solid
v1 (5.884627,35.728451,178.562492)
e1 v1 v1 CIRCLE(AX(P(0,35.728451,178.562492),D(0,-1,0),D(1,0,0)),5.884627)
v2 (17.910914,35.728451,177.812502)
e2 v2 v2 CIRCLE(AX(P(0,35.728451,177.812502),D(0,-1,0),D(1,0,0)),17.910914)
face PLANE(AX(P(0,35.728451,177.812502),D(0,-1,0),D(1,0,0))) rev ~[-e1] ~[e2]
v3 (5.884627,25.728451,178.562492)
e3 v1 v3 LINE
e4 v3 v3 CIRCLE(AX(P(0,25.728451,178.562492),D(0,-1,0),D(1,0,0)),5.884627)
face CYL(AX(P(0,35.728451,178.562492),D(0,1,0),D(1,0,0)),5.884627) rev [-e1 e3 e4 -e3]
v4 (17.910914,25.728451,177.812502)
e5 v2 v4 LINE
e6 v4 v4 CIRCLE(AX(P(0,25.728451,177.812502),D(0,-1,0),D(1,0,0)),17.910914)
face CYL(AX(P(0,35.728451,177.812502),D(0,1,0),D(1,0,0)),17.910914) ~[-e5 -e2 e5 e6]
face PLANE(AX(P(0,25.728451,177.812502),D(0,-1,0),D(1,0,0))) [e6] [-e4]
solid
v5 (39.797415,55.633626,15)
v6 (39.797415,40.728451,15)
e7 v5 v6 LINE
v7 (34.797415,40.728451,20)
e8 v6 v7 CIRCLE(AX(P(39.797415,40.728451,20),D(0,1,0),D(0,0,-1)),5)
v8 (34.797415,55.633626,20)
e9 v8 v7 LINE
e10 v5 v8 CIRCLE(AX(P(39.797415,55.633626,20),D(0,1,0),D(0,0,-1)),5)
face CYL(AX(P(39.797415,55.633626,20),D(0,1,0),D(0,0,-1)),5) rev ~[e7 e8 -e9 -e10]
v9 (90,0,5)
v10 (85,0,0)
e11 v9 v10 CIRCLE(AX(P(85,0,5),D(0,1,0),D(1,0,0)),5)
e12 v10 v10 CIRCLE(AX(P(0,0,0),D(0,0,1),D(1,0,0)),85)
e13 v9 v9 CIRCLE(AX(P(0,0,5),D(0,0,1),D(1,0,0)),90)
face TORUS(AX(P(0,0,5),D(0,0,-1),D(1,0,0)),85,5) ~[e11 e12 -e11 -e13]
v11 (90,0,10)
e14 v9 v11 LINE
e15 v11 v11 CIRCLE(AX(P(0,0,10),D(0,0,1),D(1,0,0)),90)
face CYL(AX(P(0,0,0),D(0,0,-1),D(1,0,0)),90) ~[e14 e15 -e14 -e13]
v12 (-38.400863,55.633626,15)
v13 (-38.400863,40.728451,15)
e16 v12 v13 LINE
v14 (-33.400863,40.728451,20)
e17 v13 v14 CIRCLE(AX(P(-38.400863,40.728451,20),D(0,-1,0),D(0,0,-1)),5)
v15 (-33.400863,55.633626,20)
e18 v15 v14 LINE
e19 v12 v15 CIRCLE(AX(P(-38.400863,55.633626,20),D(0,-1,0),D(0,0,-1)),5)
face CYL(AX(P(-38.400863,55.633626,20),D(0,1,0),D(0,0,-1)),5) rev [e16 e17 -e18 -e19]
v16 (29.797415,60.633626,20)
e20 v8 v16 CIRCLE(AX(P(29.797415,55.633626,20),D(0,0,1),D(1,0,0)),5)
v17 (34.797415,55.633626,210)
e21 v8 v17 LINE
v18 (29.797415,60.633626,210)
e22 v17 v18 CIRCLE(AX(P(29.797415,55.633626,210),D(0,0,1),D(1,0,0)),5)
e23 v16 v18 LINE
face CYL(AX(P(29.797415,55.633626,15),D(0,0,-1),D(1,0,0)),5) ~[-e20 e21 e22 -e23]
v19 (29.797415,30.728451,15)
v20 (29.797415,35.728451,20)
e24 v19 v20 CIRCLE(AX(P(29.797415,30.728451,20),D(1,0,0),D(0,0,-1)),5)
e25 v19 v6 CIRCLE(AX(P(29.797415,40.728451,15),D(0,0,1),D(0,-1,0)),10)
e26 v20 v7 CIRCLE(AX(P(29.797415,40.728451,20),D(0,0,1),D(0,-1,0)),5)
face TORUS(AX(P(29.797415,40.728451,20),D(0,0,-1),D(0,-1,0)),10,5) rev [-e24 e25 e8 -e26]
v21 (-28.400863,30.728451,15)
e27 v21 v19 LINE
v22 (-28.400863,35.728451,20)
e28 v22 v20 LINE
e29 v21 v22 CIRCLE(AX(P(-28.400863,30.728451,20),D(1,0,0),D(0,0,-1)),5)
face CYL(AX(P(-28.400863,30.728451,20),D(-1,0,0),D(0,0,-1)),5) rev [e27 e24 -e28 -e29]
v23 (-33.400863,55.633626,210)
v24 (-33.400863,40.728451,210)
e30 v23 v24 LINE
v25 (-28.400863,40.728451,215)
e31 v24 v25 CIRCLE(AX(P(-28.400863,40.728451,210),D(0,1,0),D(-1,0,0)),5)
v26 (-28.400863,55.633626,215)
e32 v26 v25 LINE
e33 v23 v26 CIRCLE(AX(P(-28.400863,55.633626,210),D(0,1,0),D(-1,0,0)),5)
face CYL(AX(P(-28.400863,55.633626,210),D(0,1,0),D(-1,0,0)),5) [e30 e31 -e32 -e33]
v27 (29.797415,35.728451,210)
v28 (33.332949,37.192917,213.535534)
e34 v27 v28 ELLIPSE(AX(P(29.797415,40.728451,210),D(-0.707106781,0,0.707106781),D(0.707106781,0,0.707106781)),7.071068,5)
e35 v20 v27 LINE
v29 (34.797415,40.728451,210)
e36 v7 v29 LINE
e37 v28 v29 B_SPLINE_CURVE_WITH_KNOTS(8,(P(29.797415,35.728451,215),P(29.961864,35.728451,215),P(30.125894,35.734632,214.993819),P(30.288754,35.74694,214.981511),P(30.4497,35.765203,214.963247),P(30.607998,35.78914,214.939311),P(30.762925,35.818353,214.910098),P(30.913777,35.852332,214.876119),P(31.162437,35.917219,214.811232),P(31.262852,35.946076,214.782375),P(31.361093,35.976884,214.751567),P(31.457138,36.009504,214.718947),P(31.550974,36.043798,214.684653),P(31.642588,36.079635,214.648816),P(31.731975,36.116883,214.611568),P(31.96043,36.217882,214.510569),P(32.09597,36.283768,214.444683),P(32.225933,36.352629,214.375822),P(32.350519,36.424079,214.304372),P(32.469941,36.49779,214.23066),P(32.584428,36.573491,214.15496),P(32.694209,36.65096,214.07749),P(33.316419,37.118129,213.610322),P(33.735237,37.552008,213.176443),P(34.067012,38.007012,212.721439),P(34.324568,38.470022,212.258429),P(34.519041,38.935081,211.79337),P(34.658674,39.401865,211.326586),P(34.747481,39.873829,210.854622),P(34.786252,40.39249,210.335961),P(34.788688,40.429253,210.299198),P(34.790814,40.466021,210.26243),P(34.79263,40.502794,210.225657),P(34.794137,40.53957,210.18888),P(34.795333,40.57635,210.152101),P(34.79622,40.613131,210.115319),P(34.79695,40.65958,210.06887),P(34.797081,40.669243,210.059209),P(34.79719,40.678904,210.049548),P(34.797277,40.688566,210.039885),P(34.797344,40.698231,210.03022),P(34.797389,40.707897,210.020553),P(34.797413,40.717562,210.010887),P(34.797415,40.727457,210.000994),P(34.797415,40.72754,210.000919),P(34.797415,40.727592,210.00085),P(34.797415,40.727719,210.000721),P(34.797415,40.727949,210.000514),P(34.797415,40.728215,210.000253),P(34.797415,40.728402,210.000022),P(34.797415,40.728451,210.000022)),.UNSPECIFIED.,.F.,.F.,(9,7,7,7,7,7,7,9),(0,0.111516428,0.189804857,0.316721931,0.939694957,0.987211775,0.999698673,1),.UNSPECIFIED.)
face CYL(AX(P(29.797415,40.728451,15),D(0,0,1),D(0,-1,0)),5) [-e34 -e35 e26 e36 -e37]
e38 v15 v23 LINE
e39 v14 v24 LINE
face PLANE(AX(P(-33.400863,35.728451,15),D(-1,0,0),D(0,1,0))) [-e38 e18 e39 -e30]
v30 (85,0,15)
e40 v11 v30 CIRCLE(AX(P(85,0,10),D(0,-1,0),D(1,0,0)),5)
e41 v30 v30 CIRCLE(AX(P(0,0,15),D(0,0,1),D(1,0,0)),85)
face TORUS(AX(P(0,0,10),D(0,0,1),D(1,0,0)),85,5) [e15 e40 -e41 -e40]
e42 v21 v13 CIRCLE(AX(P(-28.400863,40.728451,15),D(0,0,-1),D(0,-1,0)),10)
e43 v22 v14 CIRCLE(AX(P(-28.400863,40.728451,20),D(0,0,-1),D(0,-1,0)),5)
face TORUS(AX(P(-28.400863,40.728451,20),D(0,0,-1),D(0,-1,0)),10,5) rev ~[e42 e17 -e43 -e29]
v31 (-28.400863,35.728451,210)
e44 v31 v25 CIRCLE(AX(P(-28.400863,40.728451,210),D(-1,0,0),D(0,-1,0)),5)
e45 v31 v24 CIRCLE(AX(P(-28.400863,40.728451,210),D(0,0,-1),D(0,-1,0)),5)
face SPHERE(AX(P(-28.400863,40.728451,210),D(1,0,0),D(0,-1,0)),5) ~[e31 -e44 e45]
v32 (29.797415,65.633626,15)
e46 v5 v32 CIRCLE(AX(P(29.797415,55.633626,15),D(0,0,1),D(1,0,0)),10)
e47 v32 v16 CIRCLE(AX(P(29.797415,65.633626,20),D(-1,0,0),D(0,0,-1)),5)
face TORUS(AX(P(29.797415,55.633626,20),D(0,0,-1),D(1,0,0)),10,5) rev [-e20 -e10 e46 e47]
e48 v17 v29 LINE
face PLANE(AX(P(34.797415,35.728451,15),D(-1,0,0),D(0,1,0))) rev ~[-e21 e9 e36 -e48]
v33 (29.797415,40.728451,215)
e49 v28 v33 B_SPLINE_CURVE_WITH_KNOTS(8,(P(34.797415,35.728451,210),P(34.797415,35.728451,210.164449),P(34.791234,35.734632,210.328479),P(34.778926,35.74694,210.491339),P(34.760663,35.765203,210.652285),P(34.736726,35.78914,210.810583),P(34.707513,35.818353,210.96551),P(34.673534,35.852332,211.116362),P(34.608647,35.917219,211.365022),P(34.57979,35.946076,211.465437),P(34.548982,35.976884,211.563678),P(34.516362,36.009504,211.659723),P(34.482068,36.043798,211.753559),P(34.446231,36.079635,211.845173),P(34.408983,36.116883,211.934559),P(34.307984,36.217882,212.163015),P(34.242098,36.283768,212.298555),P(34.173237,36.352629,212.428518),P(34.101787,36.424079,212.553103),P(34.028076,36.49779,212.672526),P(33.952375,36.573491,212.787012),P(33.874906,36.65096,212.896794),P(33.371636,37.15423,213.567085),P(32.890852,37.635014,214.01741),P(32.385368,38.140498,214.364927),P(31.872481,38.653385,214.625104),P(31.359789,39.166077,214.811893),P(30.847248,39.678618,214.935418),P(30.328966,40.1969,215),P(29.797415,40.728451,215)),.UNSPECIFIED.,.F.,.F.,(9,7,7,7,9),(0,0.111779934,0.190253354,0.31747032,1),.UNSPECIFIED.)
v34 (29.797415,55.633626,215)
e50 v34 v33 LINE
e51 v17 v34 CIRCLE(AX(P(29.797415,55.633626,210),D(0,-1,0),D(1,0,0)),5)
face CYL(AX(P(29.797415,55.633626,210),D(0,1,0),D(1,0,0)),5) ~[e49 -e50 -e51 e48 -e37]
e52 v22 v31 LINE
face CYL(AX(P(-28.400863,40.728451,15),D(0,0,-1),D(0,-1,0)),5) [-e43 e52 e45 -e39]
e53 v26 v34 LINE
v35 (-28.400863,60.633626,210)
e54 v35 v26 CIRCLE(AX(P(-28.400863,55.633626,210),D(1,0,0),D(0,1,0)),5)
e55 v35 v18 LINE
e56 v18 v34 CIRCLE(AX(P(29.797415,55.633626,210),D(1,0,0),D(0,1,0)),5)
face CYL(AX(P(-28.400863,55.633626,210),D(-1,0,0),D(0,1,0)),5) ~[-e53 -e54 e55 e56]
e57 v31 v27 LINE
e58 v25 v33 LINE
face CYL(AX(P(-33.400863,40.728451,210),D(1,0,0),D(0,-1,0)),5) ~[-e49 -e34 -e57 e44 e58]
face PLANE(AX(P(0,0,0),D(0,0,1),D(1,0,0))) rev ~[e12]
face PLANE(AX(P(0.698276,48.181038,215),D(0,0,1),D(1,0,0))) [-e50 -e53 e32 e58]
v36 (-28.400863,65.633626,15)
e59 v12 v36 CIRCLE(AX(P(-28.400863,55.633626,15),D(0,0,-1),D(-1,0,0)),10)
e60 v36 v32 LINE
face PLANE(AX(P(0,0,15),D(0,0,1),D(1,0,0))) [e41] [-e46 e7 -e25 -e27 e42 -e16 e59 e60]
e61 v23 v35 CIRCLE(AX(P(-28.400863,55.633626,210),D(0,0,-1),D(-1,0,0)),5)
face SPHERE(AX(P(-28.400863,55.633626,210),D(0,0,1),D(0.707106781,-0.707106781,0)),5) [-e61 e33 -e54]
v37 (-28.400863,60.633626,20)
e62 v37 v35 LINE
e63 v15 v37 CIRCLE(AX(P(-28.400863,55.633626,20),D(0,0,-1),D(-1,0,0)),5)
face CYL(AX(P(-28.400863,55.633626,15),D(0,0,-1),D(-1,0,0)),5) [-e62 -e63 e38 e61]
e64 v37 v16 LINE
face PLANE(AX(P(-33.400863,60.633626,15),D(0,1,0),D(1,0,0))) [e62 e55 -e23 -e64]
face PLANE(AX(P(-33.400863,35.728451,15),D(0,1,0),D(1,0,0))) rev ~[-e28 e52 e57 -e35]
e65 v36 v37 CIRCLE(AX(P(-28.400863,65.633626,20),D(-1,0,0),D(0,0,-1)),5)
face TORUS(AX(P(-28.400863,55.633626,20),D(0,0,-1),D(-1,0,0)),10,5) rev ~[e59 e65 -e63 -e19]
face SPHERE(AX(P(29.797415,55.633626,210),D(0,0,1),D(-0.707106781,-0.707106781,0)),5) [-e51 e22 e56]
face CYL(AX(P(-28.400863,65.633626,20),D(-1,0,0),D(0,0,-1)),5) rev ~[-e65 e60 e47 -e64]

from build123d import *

# Parameters (mm, degrees)
F0_R          = 90
F1_DEPTH      = 15
F3_W          = 68.1982785463
F3_H          = 24.9051749706
F4_DEPTH      = 200
F6_R          = 17.9109144278
F6_R_2        = 5.8846273737
F7_DEPTH      = 10
F8_R          = 5
F9_R          = 5
F10_R         = 5
F11_T1_DEPTH  = 195
F11_T3_DEPTH  = 14.9051749706
F11_T5_DEPTH  = 27.4051749706
F11_T7_DEPTH  = 58.1982785463
F11_S11_W     = 5.1
F11_S11_H     = 5.1
F11_T12_DEPTH = 5.1
F11_S17_W     = 5.1
F11_S17_H     = 5.1
F11_T18_DEPTH = 5.1
F11_T22_ANGLE = 90
F11_T23_DEPTH = 14.9051749706
F11_T25_DEPTH = 58.1982785463
F11_T28_ANGLE = 90
F11_T30_ANGLE = 90
F11_T32_ANGLE = 90
F11_T34_ANGLE = 90


# Not quite as in the source:
# - a fillet or chamfer that OpenCascade refuses, or shapes differently, is made with other operations: its cross-section is extruded or revolved along the edge and cut away or added


with BuildPart() as f1:
    # F0 (on Top) → F1 (new body)
    with BuildSketch(Plane.XY):
        Circle(F0_R)
    extrude(amount=F1_DEPTH)

    # F3 (on face) → F4 (join)
    with BuildSketch(Plane.XY.offset(15)):
        with Locations((0.6982758641, 48.1810383499)):
            Rectangle(F3_W, F3_H)
    extrude(amount=F4_DEPTH)

    # F8
    f8_edges = [f1.edges().sort_by_distance(p)[0] for p in [
        (-90, 0, 15),
    ]]
    fillet(f8_edges, radius=F8_R)

    # F9
    f9_edges = [f1.edges().sort_by_distance(p)[0] for p in [
        (-90, 0, 0),
    ]]
    fillet(f9_edges, radius=F9_R)

    # F10
    f10_edges = [f1.edges().sort_by_distance(p)[0] for p in [
        (0.698276, 35.728451, 215),
        (34.797415, 35.728451, 115),
    ]]
    fillet(f10_edges, radius=F10_R)

    # F11: fillet of radius 5 on 14 edges, made by hand

    # F11_s2 → F11_t1 (cut)
    with BuildSketch(Plane.XY.offset(15)):
        with BuildLine():
            ThreePointArc((-28.400863409, 35.7284508646), (-31.936397315, 37.1929169586), (-33.400863409, 40.7284508646))
            Line((-33.400863409, 40.7284508646), (-33.400863409, 35.7284508646))
            Line((-33.400863409, 35.7284508646), (-28.400863409, 35.7284508646))
        make_face()
        with BuildLine():
            ThreePointArc((-33.400863409, 55.6336258352), (-31.936397315, 59.1691597411), (-28.400863409, 60.6336258352))
            Line((-28.400863409, 60.6336258352), (-33.400863409, 60.6336258352))
            Line((-33.400863409, 60.6336258352), (-33.400863409, 55.6336258352))
        make_face()
        with BuildLine():
            ThreePointArc((34.7974151373, 55.6336258352), (33.3329490432, 59.1691597411), (29.7974151373, 60.6336258352))
            Line((29.7974151373, 60.6336258352), (34.7974151373, 60.6336258352))
            Line((34.7974151373, 60.6336258352), (34.7974151373, 55.6336258352))
        make_face()
    extrude(amount=F11_T1_DEPTH, mode=Mode.SUBTRACT)

    # F11_s4 → F11_t3 (cut)
    with BuildSketch(Plane.XZ.offset(-55.6336258352)):
        with BuildLine():
            ThreePointArc((-33.400863409, 210), (-31.936397315, 213.5355339059), (-28.400863409, 215))
            Line((-28.400863409, 215), (-33.400863409, 215))
            Line((-33.400863409, 215), (-33.400863409, 210))
        make_face()
    extrude(amount=F11_T3_DEPTH, mode=Mode.SUBTRACT)

    # F11_s6 → F11_t5 (cut)
    with BuildSketch(Plane.XZ.offset(-55.6336258352)):
        with BuildLine():
            ThreePointArc((34.7974151373, 210), (33.3329490432, 213.5355339059), (29.7974151373, 215))
            Line((29.7974151373, 215), (34.7974151373, 215))
            Line((34.7974151373, 215), (34.7974151373, 210))
        make_face()
    extrude(amount=F11_T5_DEPTH, mode=Mode.SUBTRACT)

    # F11_s8 → F11_t7 (cut)
    with BuildSketch(Plane.YZ.offset(-28.400863409)):
        with BuildLine():
            ThreePointArc((60.6336258352, 210), (59.1691597411, 213.5355339059), (55.6336258352, 215))
            Line((55.6336258352, 215), (60.6336258352, 215))
            Line((60.6336258352, 215), (60.6336258352, 210))
        make_face()
    extrude(amount=F11_T7_DEPTH, mode=Mode.SUBTRACT)


with BuildPart() as f7:
    # F6 (on face) → F7 (new body)
    with BuildSketch(Plane.XZ.offset(-35.7284508646)):
        with Locations((0, 177.8125017881)):
            Circle(F6_R)
        with Locations((0, 178.5624921322)):
            Circle(F6_R_2, mode=Mode.SUBTRACT)
    extrude(amount=F7_DEPTH)


with BuildPart() as f11_tool10:
    # F11_s11 → F11_t12 (new body)
    with BuildSketch(Plane.XY.offset(210)):
        with Locations((-30.950863409, 58.1836258352)):
            Rectangle(F11_S11_W, F11_S11_H)
    extrude(amount=F11_T12_DEPTH)

    # F11_s13 → F11_t14 (revolve, cut)
    with BuildSketch(Plane(origin=(-28.400863409, 55.6336258352, 210), x_dir=(0.7071067812, -0.7071067812, 0), z_dir=(-0.7071067812, -0.7071067812, 0))):
        with BuildLine():
            ThreePointArc((0, -5), (5, 0), (0, 5))
            Line((0, 5), (0, -5))
        make_face()
    revolve(axis=Axis((-28.400863409, 55.6336258352, 210), (0, 0, 1)), mode=Mode.SUBTRACT)


with BuildPart() as f1_1:
    add(f1.part)

    # F11_t9: cut F11_tool10
    add(f11_tool10.part, mode=Mode.SUBTRACT)


with BuildPart() as f11_tool16:
    # F11_s17 → F11_t18 (new body)
    with BuildSketch(Plane.XY.offset(210)):
        with Locations((32.3474151373, 58.1836258352)):
            Rectangle(F11_S17_W, F11_S17_H)
    extrude(amount=F11_T18_DEPTH)

    # F11_s19 → F11_t20 (revolve, cut)
    with BuildSketch(Plane(origin=(29.7974151373, 55.6336258352, 210), x_dir=(-0.7071067812, -0.7071067812, 0), z_dir=(-0.7071067812, 0.7071067812, 0))):
        with BuildLine():
            ThreePointArc((0, -5), (5, 0), (0, 5))
            Line((0, 5), (0, -5))
        make_face()
    revolve(axis=Axis((29.7974151373, 55.6336258352, 210), (0, 0, 1)), mode=Mode.SUBTRACT)


with BuildPart() as f1_2:
    add(f1_1.part)

    # F11_t15: cut F11_tool16
    add(f11_tool16.part, mode=Mode.SUBTRACT)

    # F11_s21 → F11_t22 (revolve, cut)
    with BuildSketch(Plane.XY.offset(210)):
        with BuildLine():
            ThreePointArc((-33.400863409, 40.7284508646), (-31.936397315, 37.1929169586), (-28.400863409, 35.7284508646))
            Line((-28.400863409, 35.7284508646), (-33.400863409, 35.7284508646))
            Line((-33.400863409, 35.7284508646), (-33.400863409, 40.7284508646))
        make_face()
    revolve(axis=Axis((-33.400863409, 40.7284508646, 210), (-1, 0, 0)), revolution_arc=F11_T22_ANGLE, mode=Mode.SUBTRACT)

    # F11_s24 → F11_t23 (join)
    with BuildSketch(Plane.XZ.offset(-55.6336258352)):
        with BuildLine():
            ThreePointArc((-38.400863409, 15), (-34.8653295031, 16.4644660941), (-33.400863409, 20))
            Line((-33.400863409, 20), (-33.400863409, 15))
            Line((-33.400863409, 15), (-38.400863409, 15))
        make_face()
        with BuildLine():
            ThreePointArc((39.7974151373, 15), (36.2618812314, 16.4644660941), (34.7974151373, 20))
            Line((34.7974151373, 20), (34.7974151373, 15))
            Line((34.7974151373, 15), (39.7974151373, 15))
        make_face()
    extrude(amount=F11_T23_DEPTH)

    # F11_s26 → F11_t25 (join)
    with BuildSketch(Plane.YZ.offset(-28.400863409)):
        with BuildLine():
            ThreePointArc((65.6336258352, 15), (62.0980919292, 16.4644660941), (60.6336258352, 20))
            Line((60.6336258352, 20), (60.6336258352, 15))
            Line((60.6336258352, 15), (65.6336258352, 15))
        make_face()
        with BuildLine():
            ThreePointArc((30.7284508646, 15), (34.2639847705, 16.4644660941), (35.7284508646, 20))
            Line((35.7284508646, 20), (35.7284508646, 15))
            Line((35.7284508646, 15), (30.7284508646, 15))
        make_face()
    extrude(amount=F11_T25_DEPTH)

    # F11_s27 → F11_t28 (revolve)
    with BuildSketch(Plane.YZ.offset(29.7974151373)):
        with BuildLine():
            ThreePointArc((30.7284508646, 15), (34.2639847705, 16.4644660941), (35.7284508646, 20))
            Line((35.7284508646, 20), (35.7284508646, 15))
            Line((35.7284508646, 15), (30.7284508646, 15))
        make_face()
    revolve(axis=Axis((29.7974151373, 40.7284508646, 15), (0, 0, 1)), revolution_arc=F11_T28_ANGLE)

    # F11_s29 → F11_t30 (revolve)
    with BuildSketch(Plane.YZ.offset(-28.400863409)):
        with BuildLine():
            ThreePointArc((30.7284508646, 15), (34.2639847705, 16.4644660941), (35.7284508646, 20))
            Line((35.7284508646, 20), (35.7284508646, 15))
            Line((35.7284508646, 15), (30.7284508646, 15))
        make_face()
    revolve(axis=Axis((-28.400863409, 40.7284508646, 15), (0, 0, -1)), revolution_arc=F11_T30_ANGLE)

    # F11_s31 → F11_t32 (revolve)
    with BuildSketch(Plane.XZ.offset(-55.6336258352)):
        with BuildLine():
            ThreePointArc((39.7974151373, 15), (36.2618812314, 16.4644660941), (34.7974151373, 20))
            Line((34.7974151373, 20), (34.7974151373, 15))
            Line((34.7974151373, 15), (39.7974151373, 15))
        make_face()
    revolve(axis=Axis((29.7974151373, 55.6336258352, 15), (0, 0, 1)), revolution_arc=F11_T32_ANGLE)

    # F11_s33 → F11_t34 (revolve)
    with BuildSketch(Plane.XZ.offset(-55.6336258352)):
        with BuildLine():
            ThreePointArc((-38.400863409, 15), (-34.8653295031, 16.4644660941), (-33.400863409, 20))
            Line((-33.400863409, 20), (-33.400863409, 15))
            Line((-33.400863409, 15), (-38.400863409, 15))
        make_face()
    revolve(axis=Axis((-28.400863409, 55.6336258352, 15), (0, 0, -1)), revolution_arc=F11_T34_ANGLE)


solid = Compound([f7.part, f1_2.part])
